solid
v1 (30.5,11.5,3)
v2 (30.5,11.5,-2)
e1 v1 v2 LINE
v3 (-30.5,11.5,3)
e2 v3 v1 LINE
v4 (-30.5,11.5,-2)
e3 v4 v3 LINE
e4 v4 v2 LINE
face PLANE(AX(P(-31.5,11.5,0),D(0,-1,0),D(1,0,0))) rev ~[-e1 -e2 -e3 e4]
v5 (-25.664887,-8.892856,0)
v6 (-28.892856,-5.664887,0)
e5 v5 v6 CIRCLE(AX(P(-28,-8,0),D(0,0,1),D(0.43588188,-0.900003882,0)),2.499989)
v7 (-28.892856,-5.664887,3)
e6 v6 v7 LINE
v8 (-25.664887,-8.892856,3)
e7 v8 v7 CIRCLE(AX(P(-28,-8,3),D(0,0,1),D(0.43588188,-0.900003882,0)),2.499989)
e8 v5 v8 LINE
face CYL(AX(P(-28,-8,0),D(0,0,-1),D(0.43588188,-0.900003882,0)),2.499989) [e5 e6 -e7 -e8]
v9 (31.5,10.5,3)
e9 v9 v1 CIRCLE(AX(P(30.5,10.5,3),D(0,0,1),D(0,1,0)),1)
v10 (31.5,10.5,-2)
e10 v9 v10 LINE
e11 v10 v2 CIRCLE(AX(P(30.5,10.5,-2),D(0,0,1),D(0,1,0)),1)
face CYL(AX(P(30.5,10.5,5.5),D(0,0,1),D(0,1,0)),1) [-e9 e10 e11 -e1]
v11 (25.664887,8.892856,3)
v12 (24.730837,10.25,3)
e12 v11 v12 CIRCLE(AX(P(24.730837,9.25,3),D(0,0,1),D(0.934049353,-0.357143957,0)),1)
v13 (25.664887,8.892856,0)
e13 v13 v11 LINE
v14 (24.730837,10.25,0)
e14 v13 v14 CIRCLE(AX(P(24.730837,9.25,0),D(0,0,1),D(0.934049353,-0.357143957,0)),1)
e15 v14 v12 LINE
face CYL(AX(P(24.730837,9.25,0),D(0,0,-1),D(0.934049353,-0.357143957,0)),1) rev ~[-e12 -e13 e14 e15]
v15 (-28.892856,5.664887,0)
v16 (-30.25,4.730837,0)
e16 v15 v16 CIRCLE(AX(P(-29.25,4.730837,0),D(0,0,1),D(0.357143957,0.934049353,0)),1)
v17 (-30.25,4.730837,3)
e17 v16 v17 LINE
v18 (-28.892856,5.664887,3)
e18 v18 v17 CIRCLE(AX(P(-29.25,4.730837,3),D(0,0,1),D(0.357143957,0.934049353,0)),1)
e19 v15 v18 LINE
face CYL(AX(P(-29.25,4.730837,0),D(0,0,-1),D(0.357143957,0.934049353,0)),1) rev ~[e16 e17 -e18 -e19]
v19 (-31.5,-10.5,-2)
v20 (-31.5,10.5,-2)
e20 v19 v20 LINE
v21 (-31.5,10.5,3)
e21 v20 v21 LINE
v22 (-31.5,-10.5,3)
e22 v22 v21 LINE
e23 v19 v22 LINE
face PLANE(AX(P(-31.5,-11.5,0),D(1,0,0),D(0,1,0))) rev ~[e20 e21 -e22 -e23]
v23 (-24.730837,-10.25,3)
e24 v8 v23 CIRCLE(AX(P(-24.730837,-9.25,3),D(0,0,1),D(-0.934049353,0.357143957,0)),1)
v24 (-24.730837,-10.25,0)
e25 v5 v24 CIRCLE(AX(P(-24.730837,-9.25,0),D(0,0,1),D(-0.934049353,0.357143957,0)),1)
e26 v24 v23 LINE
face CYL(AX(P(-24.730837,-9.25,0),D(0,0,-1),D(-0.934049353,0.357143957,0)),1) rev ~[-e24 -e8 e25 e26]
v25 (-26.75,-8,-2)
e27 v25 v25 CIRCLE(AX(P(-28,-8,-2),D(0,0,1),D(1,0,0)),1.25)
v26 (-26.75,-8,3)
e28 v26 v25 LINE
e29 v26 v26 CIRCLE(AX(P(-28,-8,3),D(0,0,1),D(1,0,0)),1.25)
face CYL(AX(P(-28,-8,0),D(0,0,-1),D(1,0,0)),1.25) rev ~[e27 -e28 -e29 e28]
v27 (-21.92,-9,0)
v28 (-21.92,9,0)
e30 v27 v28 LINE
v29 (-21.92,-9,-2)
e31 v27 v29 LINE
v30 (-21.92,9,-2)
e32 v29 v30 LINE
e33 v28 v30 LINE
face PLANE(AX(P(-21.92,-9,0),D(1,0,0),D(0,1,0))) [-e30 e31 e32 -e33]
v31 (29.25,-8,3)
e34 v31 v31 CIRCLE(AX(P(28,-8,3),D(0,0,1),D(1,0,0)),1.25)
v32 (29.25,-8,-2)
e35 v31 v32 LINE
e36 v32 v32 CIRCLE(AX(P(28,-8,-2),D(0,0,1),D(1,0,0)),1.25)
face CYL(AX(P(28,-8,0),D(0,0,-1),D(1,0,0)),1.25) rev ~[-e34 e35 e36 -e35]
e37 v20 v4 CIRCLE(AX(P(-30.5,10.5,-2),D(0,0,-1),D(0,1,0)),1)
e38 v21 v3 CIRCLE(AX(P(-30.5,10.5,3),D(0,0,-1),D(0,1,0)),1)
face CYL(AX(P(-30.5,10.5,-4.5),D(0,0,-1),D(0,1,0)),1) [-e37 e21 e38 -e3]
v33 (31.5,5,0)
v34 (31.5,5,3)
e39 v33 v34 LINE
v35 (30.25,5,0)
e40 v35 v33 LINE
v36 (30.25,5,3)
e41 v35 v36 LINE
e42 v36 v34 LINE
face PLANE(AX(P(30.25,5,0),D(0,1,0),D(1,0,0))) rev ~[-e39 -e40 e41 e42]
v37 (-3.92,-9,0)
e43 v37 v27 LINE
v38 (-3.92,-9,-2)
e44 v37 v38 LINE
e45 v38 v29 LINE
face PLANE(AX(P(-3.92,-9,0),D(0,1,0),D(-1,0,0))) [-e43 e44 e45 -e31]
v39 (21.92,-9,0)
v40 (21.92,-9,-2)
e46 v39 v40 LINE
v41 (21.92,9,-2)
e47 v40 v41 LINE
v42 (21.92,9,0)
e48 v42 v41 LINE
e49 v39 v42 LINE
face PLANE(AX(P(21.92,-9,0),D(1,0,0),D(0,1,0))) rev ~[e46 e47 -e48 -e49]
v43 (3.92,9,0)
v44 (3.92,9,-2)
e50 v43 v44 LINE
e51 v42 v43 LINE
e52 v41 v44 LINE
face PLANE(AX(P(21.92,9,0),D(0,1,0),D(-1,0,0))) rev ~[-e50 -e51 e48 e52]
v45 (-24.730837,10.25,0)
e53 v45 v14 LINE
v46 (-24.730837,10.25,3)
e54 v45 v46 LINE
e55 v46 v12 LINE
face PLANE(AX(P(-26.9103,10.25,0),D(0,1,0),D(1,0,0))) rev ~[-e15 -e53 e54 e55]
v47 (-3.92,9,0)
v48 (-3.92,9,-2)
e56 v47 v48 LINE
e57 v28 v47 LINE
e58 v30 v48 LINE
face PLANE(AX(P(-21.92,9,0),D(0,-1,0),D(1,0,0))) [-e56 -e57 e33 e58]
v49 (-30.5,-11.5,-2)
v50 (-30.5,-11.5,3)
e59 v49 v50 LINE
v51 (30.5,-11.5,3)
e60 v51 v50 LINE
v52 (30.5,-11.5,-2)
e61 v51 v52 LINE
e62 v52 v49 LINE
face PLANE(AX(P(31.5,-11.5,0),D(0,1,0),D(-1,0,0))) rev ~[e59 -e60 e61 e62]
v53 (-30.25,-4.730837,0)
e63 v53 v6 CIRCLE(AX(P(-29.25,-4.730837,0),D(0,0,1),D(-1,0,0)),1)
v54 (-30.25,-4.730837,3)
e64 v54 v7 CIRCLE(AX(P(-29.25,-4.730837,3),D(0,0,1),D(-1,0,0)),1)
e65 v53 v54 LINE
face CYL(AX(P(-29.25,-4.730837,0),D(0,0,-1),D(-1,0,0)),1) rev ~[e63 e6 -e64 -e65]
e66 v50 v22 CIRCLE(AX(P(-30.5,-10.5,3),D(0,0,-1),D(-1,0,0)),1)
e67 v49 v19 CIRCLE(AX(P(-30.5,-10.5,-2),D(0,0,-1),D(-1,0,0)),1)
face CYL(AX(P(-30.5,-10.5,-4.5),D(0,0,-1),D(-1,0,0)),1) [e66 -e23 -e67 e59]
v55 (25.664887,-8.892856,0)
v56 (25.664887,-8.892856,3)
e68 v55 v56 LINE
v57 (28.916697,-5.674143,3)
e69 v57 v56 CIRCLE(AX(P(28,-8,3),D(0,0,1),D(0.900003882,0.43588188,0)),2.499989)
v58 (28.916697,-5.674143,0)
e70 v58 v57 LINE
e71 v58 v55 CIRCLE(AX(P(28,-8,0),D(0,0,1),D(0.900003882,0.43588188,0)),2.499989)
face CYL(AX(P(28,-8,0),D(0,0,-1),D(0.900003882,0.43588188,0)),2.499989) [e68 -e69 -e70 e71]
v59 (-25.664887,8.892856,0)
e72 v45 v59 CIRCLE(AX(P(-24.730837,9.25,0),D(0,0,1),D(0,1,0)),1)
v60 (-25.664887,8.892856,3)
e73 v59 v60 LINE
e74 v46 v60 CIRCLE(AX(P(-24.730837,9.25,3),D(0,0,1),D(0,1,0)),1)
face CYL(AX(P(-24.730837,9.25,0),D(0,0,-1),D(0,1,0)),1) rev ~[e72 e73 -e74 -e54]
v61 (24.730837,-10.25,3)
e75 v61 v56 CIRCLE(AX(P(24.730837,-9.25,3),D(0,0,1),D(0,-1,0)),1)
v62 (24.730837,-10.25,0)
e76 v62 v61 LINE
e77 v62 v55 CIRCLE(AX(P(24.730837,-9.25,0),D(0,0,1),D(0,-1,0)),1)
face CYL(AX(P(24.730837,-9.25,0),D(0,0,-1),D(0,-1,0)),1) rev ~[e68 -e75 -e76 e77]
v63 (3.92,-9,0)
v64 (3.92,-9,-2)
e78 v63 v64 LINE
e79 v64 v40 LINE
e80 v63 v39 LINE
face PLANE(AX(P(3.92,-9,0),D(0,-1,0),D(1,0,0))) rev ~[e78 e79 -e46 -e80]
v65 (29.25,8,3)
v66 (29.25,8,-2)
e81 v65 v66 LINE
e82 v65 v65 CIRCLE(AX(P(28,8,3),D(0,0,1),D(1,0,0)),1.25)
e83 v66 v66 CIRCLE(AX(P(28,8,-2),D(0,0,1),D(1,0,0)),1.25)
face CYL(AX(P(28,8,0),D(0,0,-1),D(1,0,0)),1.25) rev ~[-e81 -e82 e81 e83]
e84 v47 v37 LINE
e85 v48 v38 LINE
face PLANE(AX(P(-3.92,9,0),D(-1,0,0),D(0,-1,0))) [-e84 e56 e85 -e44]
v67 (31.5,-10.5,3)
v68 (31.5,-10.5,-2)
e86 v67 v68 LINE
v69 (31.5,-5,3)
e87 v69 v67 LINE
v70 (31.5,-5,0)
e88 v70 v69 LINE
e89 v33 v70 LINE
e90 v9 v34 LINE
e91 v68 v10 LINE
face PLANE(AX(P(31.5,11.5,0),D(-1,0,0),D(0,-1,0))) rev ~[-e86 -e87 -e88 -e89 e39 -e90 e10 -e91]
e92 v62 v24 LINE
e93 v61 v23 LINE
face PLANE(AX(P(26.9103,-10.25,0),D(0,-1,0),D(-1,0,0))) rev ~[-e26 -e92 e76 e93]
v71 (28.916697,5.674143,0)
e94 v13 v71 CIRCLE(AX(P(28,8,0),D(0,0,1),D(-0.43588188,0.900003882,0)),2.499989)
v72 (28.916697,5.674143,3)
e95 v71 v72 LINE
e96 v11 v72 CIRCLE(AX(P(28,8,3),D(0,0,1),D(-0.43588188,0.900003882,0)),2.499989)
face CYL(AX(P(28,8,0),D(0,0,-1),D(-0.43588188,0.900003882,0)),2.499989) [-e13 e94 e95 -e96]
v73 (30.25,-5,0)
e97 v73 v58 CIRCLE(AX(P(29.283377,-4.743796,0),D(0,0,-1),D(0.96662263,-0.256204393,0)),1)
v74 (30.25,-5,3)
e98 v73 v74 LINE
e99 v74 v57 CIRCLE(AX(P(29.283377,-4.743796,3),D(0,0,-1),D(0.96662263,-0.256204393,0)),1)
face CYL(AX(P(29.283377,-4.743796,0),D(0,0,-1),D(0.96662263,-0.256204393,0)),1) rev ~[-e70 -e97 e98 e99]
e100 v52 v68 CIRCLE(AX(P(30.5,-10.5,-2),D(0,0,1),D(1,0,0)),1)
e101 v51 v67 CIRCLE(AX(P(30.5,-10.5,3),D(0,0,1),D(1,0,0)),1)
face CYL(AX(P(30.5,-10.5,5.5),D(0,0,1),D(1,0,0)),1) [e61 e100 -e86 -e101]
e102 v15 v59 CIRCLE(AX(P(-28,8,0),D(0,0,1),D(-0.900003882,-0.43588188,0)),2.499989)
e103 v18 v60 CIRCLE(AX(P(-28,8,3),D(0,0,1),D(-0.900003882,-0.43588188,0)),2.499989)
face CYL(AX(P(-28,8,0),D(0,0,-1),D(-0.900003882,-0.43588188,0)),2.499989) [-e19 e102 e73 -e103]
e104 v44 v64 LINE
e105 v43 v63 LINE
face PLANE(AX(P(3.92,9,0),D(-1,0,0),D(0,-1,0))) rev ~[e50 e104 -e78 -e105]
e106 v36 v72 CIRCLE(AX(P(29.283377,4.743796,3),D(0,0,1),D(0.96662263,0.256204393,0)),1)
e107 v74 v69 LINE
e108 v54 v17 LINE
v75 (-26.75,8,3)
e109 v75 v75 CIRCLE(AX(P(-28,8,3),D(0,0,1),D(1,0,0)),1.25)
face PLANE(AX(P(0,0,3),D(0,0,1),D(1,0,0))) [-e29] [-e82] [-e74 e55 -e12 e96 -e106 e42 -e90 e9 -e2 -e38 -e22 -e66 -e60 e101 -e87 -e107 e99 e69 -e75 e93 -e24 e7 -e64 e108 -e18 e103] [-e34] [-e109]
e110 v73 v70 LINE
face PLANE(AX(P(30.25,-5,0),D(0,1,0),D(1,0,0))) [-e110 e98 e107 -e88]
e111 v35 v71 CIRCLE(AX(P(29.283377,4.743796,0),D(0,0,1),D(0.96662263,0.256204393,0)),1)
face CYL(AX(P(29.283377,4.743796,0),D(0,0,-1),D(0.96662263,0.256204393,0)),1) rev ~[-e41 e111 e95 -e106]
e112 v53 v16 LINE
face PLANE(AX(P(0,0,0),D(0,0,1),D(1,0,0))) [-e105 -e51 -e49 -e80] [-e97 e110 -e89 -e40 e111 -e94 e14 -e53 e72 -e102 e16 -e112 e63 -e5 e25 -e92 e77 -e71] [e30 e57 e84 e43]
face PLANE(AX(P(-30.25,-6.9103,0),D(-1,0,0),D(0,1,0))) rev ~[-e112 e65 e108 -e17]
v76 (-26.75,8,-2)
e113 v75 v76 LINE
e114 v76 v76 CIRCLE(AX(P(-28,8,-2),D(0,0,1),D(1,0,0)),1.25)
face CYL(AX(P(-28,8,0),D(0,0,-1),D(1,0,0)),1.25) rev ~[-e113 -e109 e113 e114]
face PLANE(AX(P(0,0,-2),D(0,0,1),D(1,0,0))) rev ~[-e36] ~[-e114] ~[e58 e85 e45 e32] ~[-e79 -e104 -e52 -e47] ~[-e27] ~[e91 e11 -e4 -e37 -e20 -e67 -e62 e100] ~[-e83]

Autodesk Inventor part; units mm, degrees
ref_plane "YZ Plane" through (0, 0, 0) normal (1, 0, 0) x (0, 1, 0)
ref_plane "XZ Plane" through (0, 0, 0) normal (0, 1, 0) x (-1, 0, 0)
ref_plane "XY Plane" through (0, 0, 0) normal (0, 0, 1) x (1, 0, 0)
sketch "スケッチ1" plane through (0, 0, 0) normal (0, 0, 1) x (1, 0, 0)
  line L0 (-31.5, 11.5) -> (31.5, 11.5)
  line L1 (31.5, 11.5) -> (31.5, -11.5)
  line L2 (31.5, -11.5) -> (-31.5, -11.5)
  line L3 (-31.5, -11.5) -> (-31.5, 11.5)
  line L4 (-31.5, 11.5) -> (31.5, -11.5) construction
  line L5 (31.5, 11.5) -> (-31.5, -11.5) construction
  line L6 (-30, 10) -> (30, 10) construction
  line L7 (30, 10) -> (30, -10) construction
  line L8 (30, -10) -> (-30, -10) construction
  line L9 (-30, -10) -> (-30, 10) construction
  line L10 (-30, 10) -> (30, -10) construction
  line L11 (30, 10) -> (-30, -10) construction
  circle A0 centre (-28, 8) radius 1.25
  line L12 (-31.5, 0) -> (31.5, 0) construction
  line L13 (0, 11.5) -> (0, -11.5) construction
  circle A1 centre (-28, -8) radius 1.25
  circle A2 centre (28, 8) radius 1.25
  circle A3 centre (28, -8) radius 1.25
  line L14 (-30.25, 10.25) -> (30.25, 10.25)
  line L15 (30.25, 10.25) -> (30.25, -10.25)
  line L16 (30.25, -10.25) -> (-30.25, -10.25)
  line L17 (-30.25, -10.25) -> (-30.25, 10.25)
  line L18 (-30.25, 10.25) -> (30.25, -10.25) construction
  line L19 (30.25, 10.25) -> (-30.25, -10.25) construction
  line L20 (-21.92, 9) -> (-3.92, 9)
  line L21 (-3.92, 9) -> (-3.92, -9)
  line L22 (-3.92, -9) -> (-21.92, -9)
  line L23 (-21.92, -9) -> (-21.92, 9)
  line L24 (-21.92, 9) -> (-3.92, -9) construction
  line L25 (-3.92, 9) -> (-21.92, -9) construction
  line L26 (21.92, 9) -> (3.92, 9)
  line L27 (3.92, 9) -> (3.92, -9)
  line L28 (3.92, -9) -> (21.92, -9)
  line L29 (21.92, -9) -> (21.92, 9)
  line L30 (21.92, 9) -> (3.92, -9) construction
  line L31 (3.92, 9) -> (21.92, -9) construction
  arc A4 (-30.25, 6.9103) -> (-26.9103, 10.25) centre (-28, 8) ccw
  arc A5 (-26.9103, -10.25) -> (-30.25, -6.9103) centre (-28, -8) ccw
  arc A6 (26.9103, 10.25) -> (30.25, 6.9103) centre (28, 8) ccw
  arc A7 (30.25, -6.9103) -> (26.9103, -10.25) centre (28, -8) ccw
  line L32 (30.25, 5) -> (31.5, 5)
  line L33 (30.25, -5) -> (31.5, -5)
  point P0 (0, 0)
  point P1 (0, 0)
  point P2 (-12.92, 0)
  point P3 (12.92, 0)
  point P4 (30.25, -6.9103)
  point P5 (26.9103, -10.25)
  point P6 (-30.25, -6.9103)
  point P7 (30.25, 6.9103)
  dimension "d0" = 63
  dimension "d1" = 60
  dimension "d2" = 20
  dimension "d3" = 23
  dimension "d4" = 2.5
  dimension "d5" = 2
  dimension "d6" = 2
  dimension "d7" = 20.5
  dimension "d8" = 60.5
  dimension "d17" = 18
  dimension "d18" = 18
  dimension "d19" = 17.08
  dimension "d22" = 2.5
  dimension "d23" = 10
extrude "押し出し1" add sketch "スケッチ1" against normal blind 2
extrude "押し出し5" add sketch "スケッチ1" along normal blind 3 contours L0 L1 L32 L15 L14 L17 L16 L33 L2 L3 | A6 L14 L15 | L15 L16 A7 | A4 L17 L14 | L16 L17 A5
fillet "フィレット2" radius 1 12 edges at (-31.5, 11.5, 0.5) (-31.5, -11.5, 0.5) (31.5, -11.5, 0.5) (31.5, 11.5, 0.5) (26.9103, 10.25, 1.5) (30.25, 6.9103, 1.5) (30.25, -6.9103, 1.5) (26.9103, -10.25, 1.5) (-26.9103, -10.25, 1.5) (-30.25, -6.9103, 1.5) (-30.25, 6.9103, 1.5) (-26.9103, 10.25, 1.5)
equation "\"d6\" = d5"
equation "\"d17\" = d18"
properties part number "StartStopSwitch_cover_02" material "アセタール樹脂、黒"
